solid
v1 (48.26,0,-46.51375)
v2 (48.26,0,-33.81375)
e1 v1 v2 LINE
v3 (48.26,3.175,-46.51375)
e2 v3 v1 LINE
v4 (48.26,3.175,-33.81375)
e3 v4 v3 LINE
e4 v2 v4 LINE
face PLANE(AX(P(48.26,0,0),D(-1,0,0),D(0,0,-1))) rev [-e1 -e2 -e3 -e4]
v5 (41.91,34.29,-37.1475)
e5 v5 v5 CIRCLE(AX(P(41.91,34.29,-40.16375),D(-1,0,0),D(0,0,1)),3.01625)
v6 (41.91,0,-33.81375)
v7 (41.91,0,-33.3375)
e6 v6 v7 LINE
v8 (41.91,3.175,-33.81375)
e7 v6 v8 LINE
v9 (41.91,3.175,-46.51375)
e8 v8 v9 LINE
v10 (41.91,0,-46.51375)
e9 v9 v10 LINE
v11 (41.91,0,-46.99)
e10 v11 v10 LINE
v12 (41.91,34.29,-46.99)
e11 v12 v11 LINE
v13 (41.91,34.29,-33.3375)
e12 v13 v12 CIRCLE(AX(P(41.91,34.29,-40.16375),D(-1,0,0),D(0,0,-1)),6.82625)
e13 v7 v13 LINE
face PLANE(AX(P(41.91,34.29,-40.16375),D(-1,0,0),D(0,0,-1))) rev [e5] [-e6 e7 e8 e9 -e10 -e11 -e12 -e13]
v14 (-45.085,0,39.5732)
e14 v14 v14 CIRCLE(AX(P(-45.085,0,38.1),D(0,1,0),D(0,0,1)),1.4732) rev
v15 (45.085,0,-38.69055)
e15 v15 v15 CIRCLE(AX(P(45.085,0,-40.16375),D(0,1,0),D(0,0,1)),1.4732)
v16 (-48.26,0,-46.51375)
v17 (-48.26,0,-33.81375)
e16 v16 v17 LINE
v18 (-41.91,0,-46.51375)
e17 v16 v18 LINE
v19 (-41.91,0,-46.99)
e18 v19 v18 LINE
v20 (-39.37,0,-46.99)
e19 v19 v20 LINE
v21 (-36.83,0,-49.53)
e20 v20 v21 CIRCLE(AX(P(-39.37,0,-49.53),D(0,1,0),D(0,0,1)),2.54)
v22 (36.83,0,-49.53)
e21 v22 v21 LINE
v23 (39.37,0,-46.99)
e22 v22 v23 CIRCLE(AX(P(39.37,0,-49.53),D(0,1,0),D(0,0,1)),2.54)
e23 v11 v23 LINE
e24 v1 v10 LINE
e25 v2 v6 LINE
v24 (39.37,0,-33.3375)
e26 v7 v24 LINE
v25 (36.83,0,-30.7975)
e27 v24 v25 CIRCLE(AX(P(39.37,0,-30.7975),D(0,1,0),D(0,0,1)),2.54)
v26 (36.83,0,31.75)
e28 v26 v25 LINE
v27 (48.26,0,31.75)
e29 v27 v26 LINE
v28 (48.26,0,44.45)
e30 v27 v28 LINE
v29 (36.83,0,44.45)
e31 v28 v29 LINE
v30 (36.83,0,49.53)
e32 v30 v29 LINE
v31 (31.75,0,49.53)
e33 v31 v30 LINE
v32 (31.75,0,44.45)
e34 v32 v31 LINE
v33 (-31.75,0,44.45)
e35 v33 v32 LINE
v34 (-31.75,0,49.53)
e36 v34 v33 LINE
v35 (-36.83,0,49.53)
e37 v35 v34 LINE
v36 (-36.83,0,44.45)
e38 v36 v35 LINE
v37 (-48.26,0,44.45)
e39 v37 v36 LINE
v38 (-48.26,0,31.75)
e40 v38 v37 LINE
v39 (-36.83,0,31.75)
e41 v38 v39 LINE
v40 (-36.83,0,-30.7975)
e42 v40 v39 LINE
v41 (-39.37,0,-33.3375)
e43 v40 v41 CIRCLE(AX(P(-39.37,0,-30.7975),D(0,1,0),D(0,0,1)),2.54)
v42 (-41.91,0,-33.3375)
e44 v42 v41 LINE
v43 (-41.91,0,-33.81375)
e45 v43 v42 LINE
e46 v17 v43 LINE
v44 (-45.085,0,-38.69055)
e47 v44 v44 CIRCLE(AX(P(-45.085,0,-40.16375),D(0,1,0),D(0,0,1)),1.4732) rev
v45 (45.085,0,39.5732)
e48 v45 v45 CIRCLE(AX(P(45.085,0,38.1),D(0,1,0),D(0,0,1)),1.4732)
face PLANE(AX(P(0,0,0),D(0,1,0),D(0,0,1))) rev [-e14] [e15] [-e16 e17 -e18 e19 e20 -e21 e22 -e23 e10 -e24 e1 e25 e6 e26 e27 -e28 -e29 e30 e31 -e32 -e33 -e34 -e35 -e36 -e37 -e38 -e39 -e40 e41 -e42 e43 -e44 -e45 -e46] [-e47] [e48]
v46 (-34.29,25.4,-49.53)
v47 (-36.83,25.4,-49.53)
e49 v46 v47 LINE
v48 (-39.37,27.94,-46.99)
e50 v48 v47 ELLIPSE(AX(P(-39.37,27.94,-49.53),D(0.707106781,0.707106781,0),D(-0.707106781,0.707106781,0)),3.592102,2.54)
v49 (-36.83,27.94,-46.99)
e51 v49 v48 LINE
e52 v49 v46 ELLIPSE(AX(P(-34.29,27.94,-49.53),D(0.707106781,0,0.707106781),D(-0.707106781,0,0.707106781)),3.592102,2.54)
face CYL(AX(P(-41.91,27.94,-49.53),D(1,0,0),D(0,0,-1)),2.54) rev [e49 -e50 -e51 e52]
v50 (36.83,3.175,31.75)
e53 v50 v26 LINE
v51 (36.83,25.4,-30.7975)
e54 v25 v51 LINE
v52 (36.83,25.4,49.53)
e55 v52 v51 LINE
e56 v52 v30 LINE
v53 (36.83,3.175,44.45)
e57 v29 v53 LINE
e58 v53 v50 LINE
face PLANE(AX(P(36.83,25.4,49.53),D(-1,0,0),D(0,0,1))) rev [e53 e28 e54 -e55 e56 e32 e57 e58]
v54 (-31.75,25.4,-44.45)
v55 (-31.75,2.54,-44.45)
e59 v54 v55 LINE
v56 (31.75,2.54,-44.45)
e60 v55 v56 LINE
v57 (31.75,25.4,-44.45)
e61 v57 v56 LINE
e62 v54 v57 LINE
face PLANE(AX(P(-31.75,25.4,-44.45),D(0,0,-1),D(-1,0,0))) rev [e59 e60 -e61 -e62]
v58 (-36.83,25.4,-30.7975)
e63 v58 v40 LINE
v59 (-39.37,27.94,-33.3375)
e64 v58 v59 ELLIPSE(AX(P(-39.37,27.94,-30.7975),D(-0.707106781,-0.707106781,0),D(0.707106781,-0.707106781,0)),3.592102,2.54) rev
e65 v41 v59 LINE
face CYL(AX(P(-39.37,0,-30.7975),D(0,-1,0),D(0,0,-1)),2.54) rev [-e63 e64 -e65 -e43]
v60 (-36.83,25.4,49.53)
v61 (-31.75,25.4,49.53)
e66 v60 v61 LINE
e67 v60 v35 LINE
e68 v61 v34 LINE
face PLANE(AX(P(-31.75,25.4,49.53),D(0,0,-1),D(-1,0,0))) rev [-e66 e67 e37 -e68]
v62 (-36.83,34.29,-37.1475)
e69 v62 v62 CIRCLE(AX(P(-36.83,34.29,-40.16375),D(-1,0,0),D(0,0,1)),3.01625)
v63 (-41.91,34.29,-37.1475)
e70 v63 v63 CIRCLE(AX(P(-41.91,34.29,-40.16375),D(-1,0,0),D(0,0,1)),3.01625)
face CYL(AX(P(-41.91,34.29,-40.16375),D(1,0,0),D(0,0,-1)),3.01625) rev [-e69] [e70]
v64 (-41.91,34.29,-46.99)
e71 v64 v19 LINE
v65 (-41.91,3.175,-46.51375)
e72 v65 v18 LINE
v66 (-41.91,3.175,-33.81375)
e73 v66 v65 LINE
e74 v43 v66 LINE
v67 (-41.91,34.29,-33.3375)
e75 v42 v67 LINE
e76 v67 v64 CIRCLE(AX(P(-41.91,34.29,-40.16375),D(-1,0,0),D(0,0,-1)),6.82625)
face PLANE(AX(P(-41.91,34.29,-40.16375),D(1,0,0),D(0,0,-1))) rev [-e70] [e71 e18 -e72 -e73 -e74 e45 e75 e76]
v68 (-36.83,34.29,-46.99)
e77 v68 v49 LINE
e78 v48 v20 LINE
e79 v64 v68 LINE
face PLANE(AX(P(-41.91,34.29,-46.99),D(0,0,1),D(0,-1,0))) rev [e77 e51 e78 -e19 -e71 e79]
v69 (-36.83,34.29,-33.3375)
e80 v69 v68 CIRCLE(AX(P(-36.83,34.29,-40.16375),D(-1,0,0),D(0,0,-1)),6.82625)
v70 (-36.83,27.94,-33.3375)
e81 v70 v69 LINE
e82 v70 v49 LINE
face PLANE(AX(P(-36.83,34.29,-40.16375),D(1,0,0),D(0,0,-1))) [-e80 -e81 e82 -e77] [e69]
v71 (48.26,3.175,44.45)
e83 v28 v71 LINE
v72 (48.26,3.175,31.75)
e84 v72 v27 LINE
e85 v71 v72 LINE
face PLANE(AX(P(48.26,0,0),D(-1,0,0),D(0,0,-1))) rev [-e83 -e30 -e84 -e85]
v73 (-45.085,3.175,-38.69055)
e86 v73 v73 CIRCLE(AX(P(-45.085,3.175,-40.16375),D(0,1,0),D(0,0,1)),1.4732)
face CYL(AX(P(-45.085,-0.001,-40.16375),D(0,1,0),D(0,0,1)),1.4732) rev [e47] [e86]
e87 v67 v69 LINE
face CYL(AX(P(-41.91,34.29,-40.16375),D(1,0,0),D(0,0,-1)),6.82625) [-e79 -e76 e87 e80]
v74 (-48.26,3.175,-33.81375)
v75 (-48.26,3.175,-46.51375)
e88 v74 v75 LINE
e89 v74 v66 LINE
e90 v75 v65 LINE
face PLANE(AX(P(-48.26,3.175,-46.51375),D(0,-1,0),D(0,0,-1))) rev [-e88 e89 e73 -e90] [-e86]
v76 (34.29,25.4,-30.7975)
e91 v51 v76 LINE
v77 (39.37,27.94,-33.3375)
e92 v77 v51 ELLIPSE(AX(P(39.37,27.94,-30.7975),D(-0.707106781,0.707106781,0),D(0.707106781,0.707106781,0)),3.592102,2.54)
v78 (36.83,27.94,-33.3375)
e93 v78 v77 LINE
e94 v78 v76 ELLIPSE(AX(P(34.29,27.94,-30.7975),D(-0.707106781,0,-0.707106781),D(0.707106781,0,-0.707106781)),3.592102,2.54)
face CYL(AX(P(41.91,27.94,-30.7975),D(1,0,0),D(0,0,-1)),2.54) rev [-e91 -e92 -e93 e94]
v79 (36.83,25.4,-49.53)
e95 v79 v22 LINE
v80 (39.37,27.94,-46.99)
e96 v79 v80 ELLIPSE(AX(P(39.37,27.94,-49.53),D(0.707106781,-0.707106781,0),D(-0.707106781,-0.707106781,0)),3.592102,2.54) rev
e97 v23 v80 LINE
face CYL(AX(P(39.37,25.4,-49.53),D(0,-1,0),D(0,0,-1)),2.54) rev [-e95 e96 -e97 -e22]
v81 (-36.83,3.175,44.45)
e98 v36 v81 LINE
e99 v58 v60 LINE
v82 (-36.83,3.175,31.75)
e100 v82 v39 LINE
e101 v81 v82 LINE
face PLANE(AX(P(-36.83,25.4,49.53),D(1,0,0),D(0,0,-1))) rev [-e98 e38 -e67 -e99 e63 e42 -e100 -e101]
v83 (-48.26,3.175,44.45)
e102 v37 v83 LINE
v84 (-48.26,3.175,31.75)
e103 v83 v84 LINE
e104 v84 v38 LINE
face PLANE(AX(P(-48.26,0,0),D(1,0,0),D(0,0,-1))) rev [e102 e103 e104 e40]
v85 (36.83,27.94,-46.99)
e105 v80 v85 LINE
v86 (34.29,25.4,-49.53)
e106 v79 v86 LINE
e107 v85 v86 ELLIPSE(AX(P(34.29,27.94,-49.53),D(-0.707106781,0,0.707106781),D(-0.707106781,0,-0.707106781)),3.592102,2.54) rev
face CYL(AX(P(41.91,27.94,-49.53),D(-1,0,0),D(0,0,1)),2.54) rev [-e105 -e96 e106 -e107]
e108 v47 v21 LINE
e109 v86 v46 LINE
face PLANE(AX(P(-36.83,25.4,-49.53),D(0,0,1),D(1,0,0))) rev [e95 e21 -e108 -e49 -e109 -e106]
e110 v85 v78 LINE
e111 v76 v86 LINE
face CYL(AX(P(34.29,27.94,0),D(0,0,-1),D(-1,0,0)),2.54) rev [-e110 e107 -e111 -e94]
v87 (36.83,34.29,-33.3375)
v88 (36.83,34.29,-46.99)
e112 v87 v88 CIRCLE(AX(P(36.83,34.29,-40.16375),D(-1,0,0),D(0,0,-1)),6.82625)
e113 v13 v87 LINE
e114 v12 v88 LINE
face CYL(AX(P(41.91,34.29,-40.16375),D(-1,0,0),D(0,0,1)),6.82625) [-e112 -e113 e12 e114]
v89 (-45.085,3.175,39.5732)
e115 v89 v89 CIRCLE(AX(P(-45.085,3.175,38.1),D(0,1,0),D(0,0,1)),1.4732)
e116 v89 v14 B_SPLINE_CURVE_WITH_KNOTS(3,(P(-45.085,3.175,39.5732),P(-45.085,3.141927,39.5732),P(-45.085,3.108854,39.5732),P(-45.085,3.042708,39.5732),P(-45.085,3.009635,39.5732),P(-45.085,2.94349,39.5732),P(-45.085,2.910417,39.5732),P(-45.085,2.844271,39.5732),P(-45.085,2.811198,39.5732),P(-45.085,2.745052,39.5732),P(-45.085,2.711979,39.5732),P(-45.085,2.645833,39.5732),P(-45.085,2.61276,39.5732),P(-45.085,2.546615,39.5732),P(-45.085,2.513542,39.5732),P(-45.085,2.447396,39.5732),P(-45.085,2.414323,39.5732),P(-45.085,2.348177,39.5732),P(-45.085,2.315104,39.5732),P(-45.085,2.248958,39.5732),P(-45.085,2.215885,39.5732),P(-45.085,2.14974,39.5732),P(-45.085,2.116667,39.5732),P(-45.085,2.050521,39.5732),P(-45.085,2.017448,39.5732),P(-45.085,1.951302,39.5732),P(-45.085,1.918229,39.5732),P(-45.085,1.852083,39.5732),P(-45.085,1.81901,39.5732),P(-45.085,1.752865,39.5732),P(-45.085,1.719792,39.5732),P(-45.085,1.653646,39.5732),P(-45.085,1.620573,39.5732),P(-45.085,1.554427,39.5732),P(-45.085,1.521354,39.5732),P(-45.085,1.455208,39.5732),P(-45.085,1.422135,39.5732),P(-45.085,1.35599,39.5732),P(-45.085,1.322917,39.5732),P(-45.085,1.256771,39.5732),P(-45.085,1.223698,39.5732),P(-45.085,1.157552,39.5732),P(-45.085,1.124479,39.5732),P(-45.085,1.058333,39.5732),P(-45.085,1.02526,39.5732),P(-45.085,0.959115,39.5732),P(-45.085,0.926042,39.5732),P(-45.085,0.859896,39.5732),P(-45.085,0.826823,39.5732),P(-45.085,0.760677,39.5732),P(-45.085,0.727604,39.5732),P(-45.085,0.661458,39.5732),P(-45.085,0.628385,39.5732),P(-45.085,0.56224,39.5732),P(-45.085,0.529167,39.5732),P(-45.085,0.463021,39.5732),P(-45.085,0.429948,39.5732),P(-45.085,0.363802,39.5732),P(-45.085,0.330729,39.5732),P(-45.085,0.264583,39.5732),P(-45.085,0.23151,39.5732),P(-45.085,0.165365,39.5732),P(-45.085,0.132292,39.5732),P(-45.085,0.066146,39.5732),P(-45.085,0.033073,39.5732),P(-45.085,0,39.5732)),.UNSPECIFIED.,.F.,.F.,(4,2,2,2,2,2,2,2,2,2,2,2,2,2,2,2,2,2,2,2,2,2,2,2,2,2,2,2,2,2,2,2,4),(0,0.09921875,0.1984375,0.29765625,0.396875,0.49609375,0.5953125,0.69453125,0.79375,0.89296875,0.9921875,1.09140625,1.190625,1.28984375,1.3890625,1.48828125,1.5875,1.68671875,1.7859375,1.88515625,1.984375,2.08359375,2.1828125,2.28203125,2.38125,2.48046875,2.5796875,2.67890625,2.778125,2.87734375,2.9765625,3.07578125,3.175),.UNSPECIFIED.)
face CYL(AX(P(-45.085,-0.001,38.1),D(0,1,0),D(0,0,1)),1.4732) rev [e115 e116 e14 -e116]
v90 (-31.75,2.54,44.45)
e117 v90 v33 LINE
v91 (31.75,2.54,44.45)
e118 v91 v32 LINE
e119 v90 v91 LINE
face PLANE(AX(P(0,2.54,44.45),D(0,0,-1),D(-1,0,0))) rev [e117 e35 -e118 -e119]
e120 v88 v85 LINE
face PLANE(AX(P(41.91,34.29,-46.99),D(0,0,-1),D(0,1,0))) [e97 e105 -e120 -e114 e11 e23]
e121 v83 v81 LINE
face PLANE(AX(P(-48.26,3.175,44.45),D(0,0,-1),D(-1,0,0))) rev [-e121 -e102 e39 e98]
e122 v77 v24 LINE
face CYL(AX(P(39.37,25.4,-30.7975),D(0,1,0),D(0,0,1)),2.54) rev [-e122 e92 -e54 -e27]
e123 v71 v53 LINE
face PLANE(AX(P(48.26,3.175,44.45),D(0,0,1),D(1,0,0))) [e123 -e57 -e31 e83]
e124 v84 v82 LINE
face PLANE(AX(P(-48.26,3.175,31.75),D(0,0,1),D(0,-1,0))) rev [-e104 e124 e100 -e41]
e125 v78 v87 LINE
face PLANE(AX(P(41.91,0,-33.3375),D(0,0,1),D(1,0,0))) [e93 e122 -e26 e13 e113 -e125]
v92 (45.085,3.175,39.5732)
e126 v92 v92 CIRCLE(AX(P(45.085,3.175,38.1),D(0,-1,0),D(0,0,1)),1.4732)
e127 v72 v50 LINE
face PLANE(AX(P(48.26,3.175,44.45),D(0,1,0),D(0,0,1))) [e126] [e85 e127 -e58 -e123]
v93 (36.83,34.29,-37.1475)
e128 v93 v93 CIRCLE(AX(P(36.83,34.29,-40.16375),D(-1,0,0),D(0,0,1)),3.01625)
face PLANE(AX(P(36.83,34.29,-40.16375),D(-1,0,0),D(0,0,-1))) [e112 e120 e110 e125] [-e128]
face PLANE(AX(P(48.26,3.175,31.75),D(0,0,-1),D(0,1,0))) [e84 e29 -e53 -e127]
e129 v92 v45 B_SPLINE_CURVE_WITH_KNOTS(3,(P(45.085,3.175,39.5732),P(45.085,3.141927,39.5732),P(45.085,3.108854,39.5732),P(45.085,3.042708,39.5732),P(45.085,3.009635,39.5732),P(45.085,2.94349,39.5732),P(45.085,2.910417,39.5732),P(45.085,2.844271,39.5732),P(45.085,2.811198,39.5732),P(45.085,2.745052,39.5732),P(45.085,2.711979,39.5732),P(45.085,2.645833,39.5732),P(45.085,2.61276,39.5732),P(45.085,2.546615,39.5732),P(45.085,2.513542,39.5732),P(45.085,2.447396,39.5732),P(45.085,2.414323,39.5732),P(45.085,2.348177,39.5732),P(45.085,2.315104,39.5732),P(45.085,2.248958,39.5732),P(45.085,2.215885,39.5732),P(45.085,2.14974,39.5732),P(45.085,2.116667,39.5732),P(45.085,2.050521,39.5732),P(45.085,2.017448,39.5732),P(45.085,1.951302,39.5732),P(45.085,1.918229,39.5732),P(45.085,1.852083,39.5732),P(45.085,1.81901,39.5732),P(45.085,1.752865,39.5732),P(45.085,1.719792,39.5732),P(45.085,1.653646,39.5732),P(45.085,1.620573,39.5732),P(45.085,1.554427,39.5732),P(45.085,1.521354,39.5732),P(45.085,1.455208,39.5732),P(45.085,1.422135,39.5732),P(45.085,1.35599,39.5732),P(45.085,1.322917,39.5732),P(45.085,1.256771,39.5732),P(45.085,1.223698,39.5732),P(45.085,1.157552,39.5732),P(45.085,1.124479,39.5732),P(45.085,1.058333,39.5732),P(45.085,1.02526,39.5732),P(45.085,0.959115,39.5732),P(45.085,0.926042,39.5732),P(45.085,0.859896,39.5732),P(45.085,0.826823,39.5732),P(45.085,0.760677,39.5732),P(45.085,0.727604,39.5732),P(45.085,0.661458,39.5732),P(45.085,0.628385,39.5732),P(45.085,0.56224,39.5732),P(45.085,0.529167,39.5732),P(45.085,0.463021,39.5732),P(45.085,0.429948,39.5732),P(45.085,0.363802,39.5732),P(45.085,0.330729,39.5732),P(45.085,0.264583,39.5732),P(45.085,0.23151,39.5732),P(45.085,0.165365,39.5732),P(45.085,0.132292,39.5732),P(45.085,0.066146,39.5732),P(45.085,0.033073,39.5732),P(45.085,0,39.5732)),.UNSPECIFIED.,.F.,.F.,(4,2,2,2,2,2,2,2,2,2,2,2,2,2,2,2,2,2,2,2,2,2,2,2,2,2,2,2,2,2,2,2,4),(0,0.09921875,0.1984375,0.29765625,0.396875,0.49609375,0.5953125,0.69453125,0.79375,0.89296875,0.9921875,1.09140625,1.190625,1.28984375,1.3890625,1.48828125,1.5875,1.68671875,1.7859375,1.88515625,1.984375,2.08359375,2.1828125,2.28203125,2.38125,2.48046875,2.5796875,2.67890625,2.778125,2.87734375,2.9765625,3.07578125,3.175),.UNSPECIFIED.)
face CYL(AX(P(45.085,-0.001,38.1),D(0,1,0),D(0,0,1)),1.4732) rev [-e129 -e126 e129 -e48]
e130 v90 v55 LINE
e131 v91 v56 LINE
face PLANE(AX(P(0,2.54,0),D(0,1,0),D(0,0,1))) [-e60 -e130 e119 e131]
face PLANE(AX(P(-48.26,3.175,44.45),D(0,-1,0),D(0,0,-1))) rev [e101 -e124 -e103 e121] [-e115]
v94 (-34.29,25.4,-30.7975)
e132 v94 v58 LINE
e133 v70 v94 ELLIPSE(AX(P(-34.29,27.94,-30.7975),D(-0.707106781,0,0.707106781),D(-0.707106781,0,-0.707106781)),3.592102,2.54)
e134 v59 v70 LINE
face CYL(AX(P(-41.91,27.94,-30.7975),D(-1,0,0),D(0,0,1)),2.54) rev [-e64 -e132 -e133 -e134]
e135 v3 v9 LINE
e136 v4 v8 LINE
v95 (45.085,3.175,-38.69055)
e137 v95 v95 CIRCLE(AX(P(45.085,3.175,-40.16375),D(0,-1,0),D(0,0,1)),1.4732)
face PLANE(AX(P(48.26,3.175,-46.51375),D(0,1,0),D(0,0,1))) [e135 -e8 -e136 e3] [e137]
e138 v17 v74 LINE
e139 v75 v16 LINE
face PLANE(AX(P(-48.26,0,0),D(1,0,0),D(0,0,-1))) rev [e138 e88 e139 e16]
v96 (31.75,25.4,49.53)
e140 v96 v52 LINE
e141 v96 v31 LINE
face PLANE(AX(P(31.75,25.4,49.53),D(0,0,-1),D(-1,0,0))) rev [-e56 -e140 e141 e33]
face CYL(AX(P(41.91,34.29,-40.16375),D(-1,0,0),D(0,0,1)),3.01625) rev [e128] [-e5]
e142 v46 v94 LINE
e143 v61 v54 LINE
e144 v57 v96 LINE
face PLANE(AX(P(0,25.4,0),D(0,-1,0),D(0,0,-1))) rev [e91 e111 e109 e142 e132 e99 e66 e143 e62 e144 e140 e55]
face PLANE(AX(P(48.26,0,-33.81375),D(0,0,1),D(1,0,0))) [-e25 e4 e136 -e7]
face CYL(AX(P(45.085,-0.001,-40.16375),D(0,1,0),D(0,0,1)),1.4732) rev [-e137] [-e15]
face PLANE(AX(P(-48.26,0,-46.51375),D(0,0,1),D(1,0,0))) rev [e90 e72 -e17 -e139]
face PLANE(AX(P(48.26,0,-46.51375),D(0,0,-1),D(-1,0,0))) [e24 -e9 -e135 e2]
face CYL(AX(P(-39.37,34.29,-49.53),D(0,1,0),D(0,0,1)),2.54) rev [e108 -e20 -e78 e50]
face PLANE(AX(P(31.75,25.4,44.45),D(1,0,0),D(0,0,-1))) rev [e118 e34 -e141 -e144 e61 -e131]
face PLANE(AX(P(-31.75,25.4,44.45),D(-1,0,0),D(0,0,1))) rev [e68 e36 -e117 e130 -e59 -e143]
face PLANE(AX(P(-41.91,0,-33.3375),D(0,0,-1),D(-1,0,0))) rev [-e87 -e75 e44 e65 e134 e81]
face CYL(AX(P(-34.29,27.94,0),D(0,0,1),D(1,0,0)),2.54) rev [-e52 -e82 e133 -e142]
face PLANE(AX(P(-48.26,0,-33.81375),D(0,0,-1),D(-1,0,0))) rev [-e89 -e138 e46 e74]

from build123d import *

# Parameters (mm, degrees)
SKETCH3_W           = 63.5
SKETCH3_H           = 88.9
BOSS_EXTRUDE1_DEPTH = 2.54
BOSS_EXTRUDE2_DEPTH = 25.4
SKETCH5_R           = 3.01625
BOSS_EXTRUDE3_DEPTH = 5.08
FILLET1_R           = 2.54
FILLET2_R           = 2.54
SKETCH6_W           = 12.7
SKETCH6_H           = 3.175
BOSS_EXTRUDE4_DEPTH = 6.35
CUT_EXTRUDE1_REACH  = 80.878
SKETCH7_R           = 1.4732
SKETCH8_W           = 12.7
SKETCH8_H           = 3.175
BOSS_EXTRUDE5_DEPTH = 11.43
CUT_EXTRUDE2_REACH  = 80.878
SKETCH9_R           = 1.4732


with BuildPart() as part:
    # Sketch3 → Boss-Extrude1 (new body)
    with BuildSketch(Plane(origin=(0, 0, 0), x_dir=(1, 0, 0), z_dir=(0, 1, 0))):
        Rectangle(SKETCH3_W, SKETCH3_H)
    extrude(amount=BOSS_EXTRUDE1_DEPTH)

    # Sketch4 → Boss-Extrude2 (add)
    with BuildSketch(Plane(origin=(0, 0, 0), x_dir=(1, 0, 0), z_dir=(0, 1, 0))):
        Polygon((-31.75, -44.45), (-31.75, 44.45), (31.75, 44.45), (31.75, -44.45), (31.75, -49.53), (36.83, -49.53), (36.83, 49.53), (-36.83, 49.53), (-36.83, -49.53), (-31.75, -49.53), align=None)
    extrude(amount=BOSS_EXTRUDE2_DEPTH)

    # Sketch5 → Boss-Extrude3 (add)
    with BuildSketch(Plane.ZY.offset(36.83)):
        with BuildLine():
            Line((-46.99, 34.29), (-46.99, 0))
            Line((-46.99, 0), (-33.3375, 0))
            Line((-33.3375, 0), (-33.3375, 34.29))
            ThreePointArc((-33.3375, 34.29), (-40.16375, 41.11625), (-46.99, 34.29))
        make_face()
        with Locations((-40.16375, 34.29)):
            Circle(SKETCH5_R, mode=Mode.SUBTRACT)
    boss_extrude3 = extrude(amount=BOSS_EXTRUDE3_DEPTH)

    # Mirror1: Boss-Extrude3 across plane
    add(boss_extrude3.mirror(Plane(origin=(0, 0, 0), x_dir=(0, 0, 1), z_dir=(1, 0, 0))))

    # Fillet1
    fillet1_edges = [part.edges().sort_by_distance(p)[0] for p in [
        (-36.83, 12.7, -46.99),
        (-36.83, 12.7, -33.3375),
        (36.83, 12.7, -46.99),
        (36.83, 12.7, -33.3375),
    ]]
    fillet(fillet1_edges, radius=FILLET1_R - 0.0001)  # a hair under: the kernel refuses the full size

    # Fillet2
    fillet2_edges = [part.edges().sort_by_distance(p)[0] for p in [
        (38.09995, 25.4, -33.3375),
        (36.83, 25.4, -40.16375),
        (38.09995, 25.4, -46.99),
        (-38.09995, 25.4, -46.99),
        (-36.83, 25.4, -40.16375),
        (-38.09995, 25.4, -33.3375),
    ]]
    fillet(fillet2_edges, radius=FILLET2_R - 0.0004)  # a hair under: the kernel refuses the full size

    # Sketch6 → Boss-Extrude4 (add)
    with BuildSketch(Plane.ZY.offset(41.91)):
        with Locations((-40.16375, 1.5875)):
            Rectangle(SKETCH6_W, SKETCH6_H)
    boss_extrude4 = extrude(amount=BOSS_EXTRUDE4_DEPTH)

    # Sketch7 → Cut-Extrude1 (cut, up to next)
    with BuildSketch(Plane(origin=(0, 3.175, 0), x_dir=(1, 0, 0), z_dir=(0, 1, 0)), mode=Mode.PRIVATE) as cut_extrude1_sk1:
        with Locations(Location((-45.085, 40.16375, 0), (0, 0, 270))):
            Circle(SKETCH7_R)
    cut_extrude1_tool1 = extrude(cut_extrude1_sk1.sketch, amount=-CUT_EXTRUDE1_REACH, mode=Mode.PRIVATE) & part.part
    cut_extrude1 = cut_extrude1_tool1.solids().sort_by_distance((-45.085, 3.175, -40.16375))[0]
    add(cut_extrude1, mode=Mode.SUBTRACT)

    # Sketch8 → Boss-Extrude5 (add)
    with BuildSketch(Plane.ZY.offset(36.83)):
        with Locations((38.1, 1.5875)):
            Rectangle(SKETCH8_W, SKETCH8_H)
    boss_extrude5 = extrude(amount=BOSS_EXTRUDE5_DEPTH)

    # Sketch9 → Cut-Extrude2 (cut, up to next)
    with BuildSketch(Plane(origin=(0, 3.175, 0), x_dir=(1, 0, 0), z_dir=(0, 1, 0)), mode=Mode.PRIVATE) as cut_extrude2_sk1:
        with Locations(Location((-45.085, -38.1, 0), (0, 0, 270))):
            Circle(SKETCH9_R)
    cut_extrude2_tool1 = extrude(cut_extrude2_sk1.sketch, amount=-CUT_EXTRUDE2_REACH, mode=Mode.PRIVATE) & part.part
    cut_extrude2 = cut_extrude2_tool1.solids().sort_by_distance((-45.085, 3.175, 38.1))[0]
    add(cut_extrude2, mode=Mode.SUBTRACT)

    # Mirror2: Boss-Extrude4, Cut-Extrude1, Boss-Extrude5, Cut-Extrude2 across plane
    add(boss_extrude4.mirror(Plane(origin=(0, 0, 0), x_dir=(0, 0, 1), z_dir=(1, 0, 0))))
    add(cut_extrude1.mirror(Plane(origin=(0, 0, 0), x_dir=(0, 0, 1), z_dir=(1, 0, 0))), mode=Mode.SUBTRACT)
    add(boss_extrude5.mirror(Plane(origin=(0, 0, 0), x_dir=(0, 0, 1), z_dir=(1, 0, 0))))
    add(cut_extrude2.mirror(Plane(origin=(0, 0, 0), x_dir=(0, 0, 1), z_dir=(1, 0, 0))), mode=Mode.SUBTRACT)


solid = part.part
